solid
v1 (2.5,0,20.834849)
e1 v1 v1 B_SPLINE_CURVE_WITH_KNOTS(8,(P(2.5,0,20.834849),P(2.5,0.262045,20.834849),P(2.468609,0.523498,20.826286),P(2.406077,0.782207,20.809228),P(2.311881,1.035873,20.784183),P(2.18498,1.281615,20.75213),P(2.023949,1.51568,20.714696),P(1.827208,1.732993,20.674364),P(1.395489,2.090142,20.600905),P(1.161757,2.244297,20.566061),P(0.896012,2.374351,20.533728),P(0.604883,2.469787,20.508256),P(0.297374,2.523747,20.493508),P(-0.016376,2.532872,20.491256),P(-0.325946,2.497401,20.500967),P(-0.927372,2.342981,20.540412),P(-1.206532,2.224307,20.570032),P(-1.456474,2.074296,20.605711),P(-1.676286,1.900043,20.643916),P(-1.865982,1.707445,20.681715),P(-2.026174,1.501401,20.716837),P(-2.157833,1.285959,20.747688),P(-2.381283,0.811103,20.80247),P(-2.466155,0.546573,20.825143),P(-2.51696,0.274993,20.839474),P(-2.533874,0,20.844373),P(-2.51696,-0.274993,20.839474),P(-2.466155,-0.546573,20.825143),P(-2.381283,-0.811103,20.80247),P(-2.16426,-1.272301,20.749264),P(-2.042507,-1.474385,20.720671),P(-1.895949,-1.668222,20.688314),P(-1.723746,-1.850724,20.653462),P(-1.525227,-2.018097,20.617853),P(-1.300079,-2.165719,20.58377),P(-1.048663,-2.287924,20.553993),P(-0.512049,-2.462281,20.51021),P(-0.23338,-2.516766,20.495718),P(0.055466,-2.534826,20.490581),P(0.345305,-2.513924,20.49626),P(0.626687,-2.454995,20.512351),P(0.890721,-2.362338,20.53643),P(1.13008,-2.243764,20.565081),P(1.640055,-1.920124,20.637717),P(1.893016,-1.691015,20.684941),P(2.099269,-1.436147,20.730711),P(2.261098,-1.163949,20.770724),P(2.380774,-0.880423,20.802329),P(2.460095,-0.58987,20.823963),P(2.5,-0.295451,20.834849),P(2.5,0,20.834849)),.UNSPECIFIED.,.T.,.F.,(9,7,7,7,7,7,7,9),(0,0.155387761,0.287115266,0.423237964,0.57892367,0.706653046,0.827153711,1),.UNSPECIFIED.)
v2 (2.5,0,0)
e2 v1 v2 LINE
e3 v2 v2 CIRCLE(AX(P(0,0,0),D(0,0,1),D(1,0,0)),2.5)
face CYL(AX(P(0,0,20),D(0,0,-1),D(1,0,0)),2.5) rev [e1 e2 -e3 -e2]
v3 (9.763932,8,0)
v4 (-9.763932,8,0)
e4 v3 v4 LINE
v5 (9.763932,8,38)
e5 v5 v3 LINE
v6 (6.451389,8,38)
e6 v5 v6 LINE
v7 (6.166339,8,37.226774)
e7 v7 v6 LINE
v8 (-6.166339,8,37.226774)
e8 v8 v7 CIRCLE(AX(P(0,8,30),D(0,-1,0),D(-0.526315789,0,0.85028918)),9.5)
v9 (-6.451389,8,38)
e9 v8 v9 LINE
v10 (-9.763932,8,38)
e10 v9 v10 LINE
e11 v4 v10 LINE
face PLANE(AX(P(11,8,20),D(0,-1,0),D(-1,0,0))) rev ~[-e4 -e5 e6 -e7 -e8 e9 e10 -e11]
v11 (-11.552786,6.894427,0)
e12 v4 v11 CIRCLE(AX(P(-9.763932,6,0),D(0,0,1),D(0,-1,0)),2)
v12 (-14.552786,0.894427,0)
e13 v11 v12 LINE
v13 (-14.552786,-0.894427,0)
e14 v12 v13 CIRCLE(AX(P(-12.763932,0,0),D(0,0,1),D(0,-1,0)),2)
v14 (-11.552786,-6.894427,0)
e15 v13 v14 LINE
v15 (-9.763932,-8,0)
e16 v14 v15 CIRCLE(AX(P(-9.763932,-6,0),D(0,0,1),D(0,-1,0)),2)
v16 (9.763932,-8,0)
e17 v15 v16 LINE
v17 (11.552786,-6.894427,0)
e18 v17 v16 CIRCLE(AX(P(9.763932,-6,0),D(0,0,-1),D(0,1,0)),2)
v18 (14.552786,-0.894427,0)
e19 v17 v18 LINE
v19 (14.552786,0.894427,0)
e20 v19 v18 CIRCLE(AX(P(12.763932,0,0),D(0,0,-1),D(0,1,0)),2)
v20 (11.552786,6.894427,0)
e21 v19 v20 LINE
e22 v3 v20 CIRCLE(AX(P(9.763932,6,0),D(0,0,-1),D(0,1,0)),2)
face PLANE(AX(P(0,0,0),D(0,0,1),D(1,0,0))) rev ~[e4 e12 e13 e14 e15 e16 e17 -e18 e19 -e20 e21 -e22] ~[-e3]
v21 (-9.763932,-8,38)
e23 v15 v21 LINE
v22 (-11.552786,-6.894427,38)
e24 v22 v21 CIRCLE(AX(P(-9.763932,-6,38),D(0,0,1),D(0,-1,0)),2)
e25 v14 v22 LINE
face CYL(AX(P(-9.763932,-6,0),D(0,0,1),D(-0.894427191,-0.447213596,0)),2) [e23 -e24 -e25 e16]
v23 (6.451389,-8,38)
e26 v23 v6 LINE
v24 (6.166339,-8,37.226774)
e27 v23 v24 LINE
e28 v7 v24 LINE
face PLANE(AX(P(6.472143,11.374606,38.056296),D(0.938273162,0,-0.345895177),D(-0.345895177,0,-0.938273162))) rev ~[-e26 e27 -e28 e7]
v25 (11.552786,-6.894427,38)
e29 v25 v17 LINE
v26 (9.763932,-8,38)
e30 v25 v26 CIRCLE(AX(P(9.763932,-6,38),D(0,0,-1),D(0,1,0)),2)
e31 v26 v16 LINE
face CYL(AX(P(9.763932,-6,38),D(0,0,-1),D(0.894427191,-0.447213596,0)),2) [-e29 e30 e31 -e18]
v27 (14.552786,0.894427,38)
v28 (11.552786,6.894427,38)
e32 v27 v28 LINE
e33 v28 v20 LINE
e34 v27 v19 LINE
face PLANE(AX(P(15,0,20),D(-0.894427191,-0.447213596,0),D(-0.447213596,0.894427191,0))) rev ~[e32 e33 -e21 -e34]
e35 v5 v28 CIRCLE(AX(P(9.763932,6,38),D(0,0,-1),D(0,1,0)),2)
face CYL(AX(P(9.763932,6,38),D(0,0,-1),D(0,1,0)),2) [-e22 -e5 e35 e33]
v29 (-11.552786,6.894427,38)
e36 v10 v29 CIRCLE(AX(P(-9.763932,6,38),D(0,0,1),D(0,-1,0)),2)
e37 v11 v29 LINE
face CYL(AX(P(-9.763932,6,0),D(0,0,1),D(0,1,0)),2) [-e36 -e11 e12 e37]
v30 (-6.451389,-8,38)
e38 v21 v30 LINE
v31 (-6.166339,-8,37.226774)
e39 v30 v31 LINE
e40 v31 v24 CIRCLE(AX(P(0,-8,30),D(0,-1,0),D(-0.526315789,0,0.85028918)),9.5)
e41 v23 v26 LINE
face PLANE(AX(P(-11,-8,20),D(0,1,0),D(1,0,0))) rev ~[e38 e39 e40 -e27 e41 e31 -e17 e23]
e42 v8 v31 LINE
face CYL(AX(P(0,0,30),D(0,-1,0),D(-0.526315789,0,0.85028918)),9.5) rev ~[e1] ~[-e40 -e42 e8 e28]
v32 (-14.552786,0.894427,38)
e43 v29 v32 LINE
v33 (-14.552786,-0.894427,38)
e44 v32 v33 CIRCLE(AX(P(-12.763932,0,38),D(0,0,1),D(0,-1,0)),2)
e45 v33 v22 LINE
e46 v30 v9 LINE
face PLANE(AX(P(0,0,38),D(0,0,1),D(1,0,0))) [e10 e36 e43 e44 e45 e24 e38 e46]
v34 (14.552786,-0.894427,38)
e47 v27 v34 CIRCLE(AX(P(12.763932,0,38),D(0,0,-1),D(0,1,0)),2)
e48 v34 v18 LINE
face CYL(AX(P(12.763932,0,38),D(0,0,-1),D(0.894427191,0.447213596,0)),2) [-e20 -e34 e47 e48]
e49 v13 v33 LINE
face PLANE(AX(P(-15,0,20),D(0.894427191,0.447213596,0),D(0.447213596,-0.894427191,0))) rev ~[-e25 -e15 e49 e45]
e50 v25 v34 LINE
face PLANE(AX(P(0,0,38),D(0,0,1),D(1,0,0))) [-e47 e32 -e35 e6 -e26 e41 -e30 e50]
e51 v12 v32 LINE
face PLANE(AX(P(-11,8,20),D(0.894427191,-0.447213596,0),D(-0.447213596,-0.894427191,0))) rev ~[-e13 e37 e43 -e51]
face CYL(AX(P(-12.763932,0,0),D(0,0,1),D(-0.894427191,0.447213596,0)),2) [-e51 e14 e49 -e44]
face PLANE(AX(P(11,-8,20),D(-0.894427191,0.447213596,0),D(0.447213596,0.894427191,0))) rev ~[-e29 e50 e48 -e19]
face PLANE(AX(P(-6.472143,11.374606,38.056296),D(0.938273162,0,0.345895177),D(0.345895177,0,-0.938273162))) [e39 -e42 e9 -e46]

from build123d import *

# Parameters (mm, degrees)
F0_R        = 2.5
F1_DEPTH    = 20
F2_DEPTH    = 18
F4_DEPTH    = 12.5
F5_R        = 2
F6_T1_DEPTH = 22.7492112937


# Not quite as in the source:
# - a fillet or chamfer that OpenCascade refuses, or shapes differently, is made with other operations: its cross-section is extruded or revolved along the edge and cut away or added


with BuildPart() as f1:
    # F0 (on Top) → F1 (new body)
    with BuildSketch(Plane.XY):
        Polygon((11, 8), (-11, 8), (-15, 0), (-11, -8), (11, -8), (15, 0), align=None)
        Circle(F0_R, mode=Mode.SUBTRACT)
    extrude(amount=F1_DEPTH)

    # F2 (add): a face of the model
    f2_faces = [f1.faces().sort_by_distance(p)[0] for p in [
        (0, 7.66, 20),
    ]]
    extrude(f2_faces, amount=F2_DEPTH)

    # F3 (on Front) → F4 (cut, symmetric)
    with BuildSketch(Plane.XZ):
        with BuildLine():
            Line((5, 38.0777472107), (-5, 38.0777472107))
            ThreePointArc((-5, 38.0777472107), (0, 20.5), (5, 38.0777472107))
        make_face()
    extrude(amount=F4_DEPTH, both=True, mode=Mode.SUBTRACT)

    # F5
    f5_edges = [f1.edges().sort_by_distance(p)[0] for p in [
        (11, -8, 19),
        (15, 0, 19),
        (11, 8, 19),
        (-11, -8, 19),
        (-15, 0, 19),
        (-11, 8, 19),
    ]]
    fillet(f5_edges, radius=F5_R)

    # F6: chamfer of 1.5 on 2 edges, made by hand

    # F6_s2 → F6_t1 (cut)
    with BuildSketch(Plane.XZ.offset(-11.3746056469)):
        with BuildLine():
            Line((-6.4721431849, 38.0562963897), (-6.1455853598, 37.1704776118))
            Line((-6.1455853598, 37.1704776118), (-6.1261127101, 37.1476562202))
            ThreePointArc((-6.1261127101, 37.1476562202), (-5.6470472065, 37.6020890449), (-5.107295987, 37.9747368421))
            Line((-5.107295987, 37.9747368421), (-5.123475383, 38.03))
            ThreePointArc((-5.123475383, 38.03), (-5.7978092839, 38.03), (-6.4721431849, 38.0862963897))
            Line((-6.4721431849, 38.0862963897), (-6.4721431849, 38.0562963897))
        make_face()
        with BuildLine():
            Line((6.4721431849, 38.0562963897), (6.1455853598, 37.1704776118))
            Line((6.1455853598, 37.1704776118), (6.1261127101, 37.1476562202))
            ThreePointArc((6.1261127101, 37.1476562202), (5.6470472065, 37.6020890449), (5.107295987, 37.9747368421))
            Line((5.107295987, 37.9747368421), (5.123475383, 38.03))
            ThreePointArc((5.123475383, 38.03), (5.7978092839, 38.03), (6.4721431849, 38.0862963897))
            Line((6.4721431849, 38.0862963897), (6.4721431849, 38.0562963897))
        make_face()
    extrude(amount=F6_T1_DEPTH, mode=Mode.SUBTRACT)


solid = f1.part
